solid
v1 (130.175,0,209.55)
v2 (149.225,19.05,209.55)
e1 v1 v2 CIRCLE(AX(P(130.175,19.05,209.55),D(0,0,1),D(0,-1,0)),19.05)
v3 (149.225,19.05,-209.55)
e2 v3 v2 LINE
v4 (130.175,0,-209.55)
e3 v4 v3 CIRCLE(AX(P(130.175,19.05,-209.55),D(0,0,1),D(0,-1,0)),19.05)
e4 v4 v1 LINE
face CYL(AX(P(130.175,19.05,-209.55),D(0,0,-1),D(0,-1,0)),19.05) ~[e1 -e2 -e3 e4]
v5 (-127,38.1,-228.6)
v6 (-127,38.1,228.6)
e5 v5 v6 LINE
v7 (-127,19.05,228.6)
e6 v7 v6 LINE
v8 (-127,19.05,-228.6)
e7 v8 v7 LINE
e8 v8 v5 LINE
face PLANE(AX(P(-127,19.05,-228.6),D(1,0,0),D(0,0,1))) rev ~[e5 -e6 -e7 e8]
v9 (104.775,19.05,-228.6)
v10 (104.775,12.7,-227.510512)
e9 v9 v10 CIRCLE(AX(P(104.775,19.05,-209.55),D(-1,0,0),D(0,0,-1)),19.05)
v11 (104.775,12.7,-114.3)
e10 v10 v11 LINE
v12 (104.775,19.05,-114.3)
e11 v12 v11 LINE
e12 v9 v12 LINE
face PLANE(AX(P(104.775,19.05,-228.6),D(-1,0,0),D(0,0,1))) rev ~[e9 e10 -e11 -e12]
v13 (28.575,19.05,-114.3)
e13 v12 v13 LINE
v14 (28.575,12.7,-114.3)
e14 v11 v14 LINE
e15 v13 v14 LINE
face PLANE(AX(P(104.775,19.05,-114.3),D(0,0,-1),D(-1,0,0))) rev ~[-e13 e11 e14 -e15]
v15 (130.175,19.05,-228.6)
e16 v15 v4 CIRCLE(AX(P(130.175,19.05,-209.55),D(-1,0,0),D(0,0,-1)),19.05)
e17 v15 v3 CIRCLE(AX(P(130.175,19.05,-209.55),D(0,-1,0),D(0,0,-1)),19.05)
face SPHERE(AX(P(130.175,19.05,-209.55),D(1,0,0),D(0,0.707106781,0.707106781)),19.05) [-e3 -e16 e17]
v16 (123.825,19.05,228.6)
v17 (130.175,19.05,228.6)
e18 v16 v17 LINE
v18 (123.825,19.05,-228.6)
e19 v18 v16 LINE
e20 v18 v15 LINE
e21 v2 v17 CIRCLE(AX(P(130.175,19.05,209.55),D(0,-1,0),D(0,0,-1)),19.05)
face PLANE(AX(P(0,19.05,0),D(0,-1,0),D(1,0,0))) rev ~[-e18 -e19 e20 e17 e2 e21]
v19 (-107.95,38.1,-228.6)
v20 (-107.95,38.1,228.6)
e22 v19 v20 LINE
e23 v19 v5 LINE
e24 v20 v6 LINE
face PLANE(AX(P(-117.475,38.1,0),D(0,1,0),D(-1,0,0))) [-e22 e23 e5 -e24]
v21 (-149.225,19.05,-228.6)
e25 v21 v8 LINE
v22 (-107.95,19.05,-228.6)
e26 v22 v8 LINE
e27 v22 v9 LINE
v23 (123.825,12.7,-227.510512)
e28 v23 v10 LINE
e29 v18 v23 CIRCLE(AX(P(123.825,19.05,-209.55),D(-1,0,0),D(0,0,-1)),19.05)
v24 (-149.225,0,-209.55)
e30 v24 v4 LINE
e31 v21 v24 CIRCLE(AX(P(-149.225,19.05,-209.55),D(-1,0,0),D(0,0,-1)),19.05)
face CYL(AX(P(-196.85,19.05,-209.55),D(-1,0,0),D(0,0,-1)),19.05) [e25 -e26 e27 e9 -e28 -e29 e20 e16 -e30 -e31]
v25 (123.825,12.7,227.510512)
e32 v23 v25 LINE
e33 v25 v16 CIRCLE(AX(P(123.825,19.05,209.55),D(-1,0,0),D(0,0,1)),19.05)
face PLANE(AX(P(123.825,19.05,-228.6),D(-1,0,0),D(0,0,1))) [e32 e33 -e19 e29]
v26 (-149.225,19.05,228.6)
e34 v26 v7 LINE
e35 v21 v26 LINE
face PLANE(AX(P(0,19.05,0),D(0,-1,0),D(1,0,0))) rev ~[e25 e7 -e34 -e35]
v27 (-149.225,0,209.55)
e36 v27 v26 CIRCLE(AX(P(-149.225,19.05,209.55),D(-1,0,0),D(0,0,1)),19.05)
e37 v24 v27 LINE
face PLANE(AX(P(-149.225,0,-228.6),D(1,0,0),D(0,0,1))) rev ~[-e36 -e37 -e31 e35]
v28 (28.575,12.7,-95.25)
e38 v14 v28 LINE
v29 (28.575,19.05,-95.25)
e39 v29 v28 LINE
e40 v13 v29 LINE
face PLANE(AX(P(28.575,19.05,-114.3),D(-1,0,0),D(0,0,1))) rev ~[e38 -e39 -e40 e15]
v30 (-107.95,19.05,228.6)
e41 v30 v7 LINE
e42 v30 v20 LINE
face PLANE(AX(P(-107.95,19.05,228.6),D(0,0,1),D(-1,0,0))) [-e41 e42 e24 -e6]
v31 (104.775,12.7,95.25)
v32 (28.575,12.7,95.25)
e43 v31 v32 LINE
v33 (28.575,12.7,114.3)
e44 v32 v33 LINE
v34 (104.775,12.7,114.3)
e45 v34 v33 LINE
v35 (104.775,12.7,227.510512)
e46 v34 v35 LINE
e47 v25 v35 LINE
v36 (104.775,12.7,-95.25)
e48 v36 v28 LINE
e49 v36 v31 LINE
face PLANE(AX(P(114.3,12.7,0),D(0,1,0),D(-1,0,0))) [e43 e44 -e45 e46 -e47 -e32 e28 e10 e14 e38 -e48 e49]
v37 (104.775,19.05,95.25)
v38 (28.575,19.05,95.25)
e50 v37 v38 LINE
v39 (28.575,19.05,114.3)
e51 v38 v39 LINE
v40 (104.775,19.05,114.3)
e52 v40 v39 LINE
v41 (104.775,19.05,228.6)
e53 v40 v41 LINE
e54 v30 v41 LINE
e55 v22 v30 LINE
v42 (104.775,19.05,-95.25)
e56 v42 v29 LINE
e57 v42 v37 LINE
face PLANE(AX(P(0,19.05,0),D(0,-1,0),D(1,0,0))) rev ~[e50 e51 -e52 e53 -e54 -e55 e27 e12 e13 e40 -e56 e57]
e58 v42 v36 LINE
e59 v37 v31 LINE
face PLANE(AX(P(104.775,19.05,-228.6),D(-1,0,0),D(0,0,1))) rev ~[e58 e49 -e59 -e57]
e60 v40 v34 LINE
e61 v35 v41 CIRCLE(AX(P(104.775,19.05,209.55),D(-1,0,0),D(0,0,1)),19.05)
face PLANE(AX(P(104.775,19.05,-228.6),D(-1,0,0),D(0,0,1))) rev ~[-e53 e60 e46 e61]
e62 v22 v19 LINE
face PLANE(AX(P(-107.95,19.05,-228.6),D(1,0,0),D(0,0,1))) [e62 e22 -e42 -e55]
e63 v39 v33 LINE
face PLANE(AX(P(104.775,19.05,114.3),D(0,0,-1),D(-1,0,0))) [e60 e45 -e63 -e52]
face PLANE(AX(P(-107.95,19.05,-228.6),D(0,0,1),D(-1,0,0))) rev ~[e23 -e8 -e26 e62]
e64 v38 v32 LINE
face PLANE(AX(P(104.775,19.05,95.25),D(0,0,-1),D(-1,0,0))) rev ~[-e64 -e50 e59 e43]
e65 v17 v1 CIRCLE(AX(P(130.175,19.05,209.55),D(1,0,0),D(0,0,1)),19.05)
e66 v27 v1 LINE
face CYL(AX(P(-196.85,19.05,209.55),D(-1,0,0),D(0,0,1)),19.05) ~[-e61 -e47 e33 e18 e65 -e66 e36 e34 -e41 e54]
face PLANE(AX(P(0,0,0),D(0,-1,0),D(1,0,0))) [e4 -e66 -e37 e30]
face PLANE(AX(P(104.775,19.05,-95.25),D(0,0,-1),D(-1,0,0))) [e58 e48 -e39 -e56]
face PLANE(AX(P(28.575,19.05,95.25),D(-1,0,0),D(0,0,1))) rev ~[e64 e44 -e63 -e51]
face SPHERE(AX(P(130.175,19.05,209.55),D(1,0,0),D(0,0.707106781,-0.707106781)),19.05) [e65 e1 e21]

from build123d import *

# Parameters (mm, degrees)
F0_W         = 298.45
F0_H         = 457.2
F1_DEPTH     = 19.05
F3_W         = 19.05
F3_H         = 457.2
F4_DEPTH     = 6.35
F5_T1_DEPTH  = 327.025
F5_T3_DEPTH  = 419.1
F5_T5_DEPTH  = 47.625
F5_S9_W      = 19.05
F5_S9_H      = 19.05
F5_T10_DEPTH = 19.05
F5_S15_W     = 19.05
F5_S15_H     = 19.05
F5_T16_DEPTH = 19.05
F6_W         = 19.05
F6_H         = 457.2
F7_DEPTH     = 19.05
F8_W         = 76.2
F8_H         = 19.05
F9_DEPTH     = 6.35


# Not quite as in the source:
# - a fillet or chamfer that OpenCascade refuses, or shapes differently, is made with other operations: its cross-section is extruded or revolved along the edge and cut away or added


with BuildPart() as f1:
    # F0 (on Front) → F1 (new body)
    with BuildSketch(Plane.XZ):
        Rectangle(F0_W, F0_H)
    extrude(amount=-F1_DEPTH)

    # F3 (on face) → F4 (cut)
    with BuildSketch(Plane(origin=(0, 19.05, 0), x_dir=(-1, 0, 0), z_dir=(0, 1, 0))):
        with Locations((-114.3, 0)):
            Rectangle(F3_W, F3_H)
    extrude(amount=-F4_DEPTH, mode=Mode.SUBTRACT)

    # F5: fillet of radius 19.05 on 5 edges, made by hand

    # F5_s2 → F5_t1 (cut)
    with BuildSketch(Plane.YZ.offset(-196.85)):
        with BuildLine():
            ThreePointArc((19.05, -228.6), (5.5796158184, -223.0203841816), (0, -209.55))
            Line((0, -209.55), (0, -228.6))
            Line((0, -228.6), (19.05, -228.6))
        make_face()
        with BuildLine():
            ThreePointArc((19.05, 228.6), (5.5796158184, 223.0203841816), (0, 209.55))
            Line((0, 209.55), (0, 228.6))
            Line((0, 228.6), (19.05, 228.6))
        make_face()
    extrude(amount=F5_T1_DEPTH, mode=Mode.SUBTRACT)

    # F5_s4 → F5_t3 (cut)
    with BuildSketch(Plane.XY.offset(-209.55)):
        with BuildLine():
            ThreePointArc((130.175, 0), (143.6453841816, 5.5796158184), (149.225, 19.05))
            Line((149.225, 19.05), (149.225, 0))
            Line((149.225, 0), (130.175, 0))
        make_face()
    extrude(amount=F5_T3_DEPTH, mode=Mode.SUBTRACT)

    # F5_s6 → F5_t5 (cut)
    with BuildSketch(Plane.XZ.offset(-66.675)):
        with BuildLine():
            ThreePointArc((130.175, -228.6), (143.6453841816, -223.0203841816), (149.225, -209.55))
            Line((149.225, -209.55), (149.225, -228.6))
            Line((149.225, -228.6), (130.175, -228.6))
        make_face()
        with BuildLine():
            ThreePointArc((130.175, 228.6), (143.6453841816, 223.0203841816), (149.225, 209.55))
            Line((149.225, 209.55), (149.225, 228.6))
            Line((149.225, 228.6), (130.175, 228.6))
        make_face()
    extrude(amount=F5_T5_DEPTH, mode=Mode.SUBTRACT)


with BuildPart() as f5_tool8:
    # F5_s9 → F5_t10 (new body)
    with BuildSketch(Plane.YZ.offset(130.175)):
        with Locations((9.525, -219.075)):
            Rectangle(F5_S9_W, F5_S9_H)
    extrude(amount=F5_T10_DEPTH)

    # F5_s11 → F5_t12 (revolve, cut)
    with BuildSketch(Plane(origin=(130.175, 19.05, -209.55), x_dir=(0, 0.7071067812, 0.7071067812), z_dir=(0, 0.7071067812, -0.7071067812))):
        with BuildLine():
            ThreePointArc((0, -19.05), (19.05, 0), (0, 19.05))
            Line((0, 19.05), (0, -19.05))
        make_face()
    revolve(axis=Axis((130.175, 19.05, -209.55), (1, 0, 0)), mode=Mode.SUBTRACT)


with BuildPart() as f1_1:
    add(f1.part)

    # F5_t7: cut F5_tool8
    add(f5_tool8.part, mode=Mode.SUBTRACT)


with BuildPart() as f5_tool14:
    # F5_s15 → F5_t16 (new body)
    with BuildSketch(Plane.YZ.offset(130.175)):
        with Locations((9.525, 219.075)):
            Rectangle(F5_S15_W, F5_S15_H)
    extrude(amount=F5_T16_DEPTH)

    # F5_s17 → F5_t18 (revolve, cut)
    with BuildSketch(Plane(origin=(130.175, 19.05, 209.55), x_dir=(0, 0.7071067812, -0.7071067812), z_dir=(0, -0.7071067812, -0.7071067812))):
        with BuildLine():
            ThreePointArc((0, -19.05), (19.05, 0), (0, 19.05))
            Line((0, 19.05), (0, -19.05))
        make_face()
    revolve(axis=Axis((130.175, 19.05, 209.55), (1, 0, 0)), mode=Mode.SUBTRACT)


with BuildPart() as f1_2:
    add(f1_1.part)

    # F5_t13: cut F5_tool14
    add(f5_tool14.part, mode=Mode.SUBTRACT)

    # F6 (on face) → F7 (join)
    with BuildSketch(Plane(origin=(0, 19.05, 0), x_dir=(-1, 0, 0), z_dir=(0, 1, 0))):
        with Locations((117.475, 0)):
            Rectangle(F6_W, F6_H)
    extrude(amount=F7_DEPTH)

    # F8 (on face) → F9 (cut, through all)
    with BuildSketch(Plane(origin=(0, 19.05, 0), x_dir=(-1, 0, 0), z_dir=(0, 1, 0))):
        with Locations((-66.675, 104.775)):
            Rectangle(F8_W, F8_H)
        with Locations((-66.675, -104.775)):
            Rectangle(F8_W, F8_H)
    extrude(amount=-F9_DEPTH, mode=Mode.SUBTRACT)


solid = f1_2.part
